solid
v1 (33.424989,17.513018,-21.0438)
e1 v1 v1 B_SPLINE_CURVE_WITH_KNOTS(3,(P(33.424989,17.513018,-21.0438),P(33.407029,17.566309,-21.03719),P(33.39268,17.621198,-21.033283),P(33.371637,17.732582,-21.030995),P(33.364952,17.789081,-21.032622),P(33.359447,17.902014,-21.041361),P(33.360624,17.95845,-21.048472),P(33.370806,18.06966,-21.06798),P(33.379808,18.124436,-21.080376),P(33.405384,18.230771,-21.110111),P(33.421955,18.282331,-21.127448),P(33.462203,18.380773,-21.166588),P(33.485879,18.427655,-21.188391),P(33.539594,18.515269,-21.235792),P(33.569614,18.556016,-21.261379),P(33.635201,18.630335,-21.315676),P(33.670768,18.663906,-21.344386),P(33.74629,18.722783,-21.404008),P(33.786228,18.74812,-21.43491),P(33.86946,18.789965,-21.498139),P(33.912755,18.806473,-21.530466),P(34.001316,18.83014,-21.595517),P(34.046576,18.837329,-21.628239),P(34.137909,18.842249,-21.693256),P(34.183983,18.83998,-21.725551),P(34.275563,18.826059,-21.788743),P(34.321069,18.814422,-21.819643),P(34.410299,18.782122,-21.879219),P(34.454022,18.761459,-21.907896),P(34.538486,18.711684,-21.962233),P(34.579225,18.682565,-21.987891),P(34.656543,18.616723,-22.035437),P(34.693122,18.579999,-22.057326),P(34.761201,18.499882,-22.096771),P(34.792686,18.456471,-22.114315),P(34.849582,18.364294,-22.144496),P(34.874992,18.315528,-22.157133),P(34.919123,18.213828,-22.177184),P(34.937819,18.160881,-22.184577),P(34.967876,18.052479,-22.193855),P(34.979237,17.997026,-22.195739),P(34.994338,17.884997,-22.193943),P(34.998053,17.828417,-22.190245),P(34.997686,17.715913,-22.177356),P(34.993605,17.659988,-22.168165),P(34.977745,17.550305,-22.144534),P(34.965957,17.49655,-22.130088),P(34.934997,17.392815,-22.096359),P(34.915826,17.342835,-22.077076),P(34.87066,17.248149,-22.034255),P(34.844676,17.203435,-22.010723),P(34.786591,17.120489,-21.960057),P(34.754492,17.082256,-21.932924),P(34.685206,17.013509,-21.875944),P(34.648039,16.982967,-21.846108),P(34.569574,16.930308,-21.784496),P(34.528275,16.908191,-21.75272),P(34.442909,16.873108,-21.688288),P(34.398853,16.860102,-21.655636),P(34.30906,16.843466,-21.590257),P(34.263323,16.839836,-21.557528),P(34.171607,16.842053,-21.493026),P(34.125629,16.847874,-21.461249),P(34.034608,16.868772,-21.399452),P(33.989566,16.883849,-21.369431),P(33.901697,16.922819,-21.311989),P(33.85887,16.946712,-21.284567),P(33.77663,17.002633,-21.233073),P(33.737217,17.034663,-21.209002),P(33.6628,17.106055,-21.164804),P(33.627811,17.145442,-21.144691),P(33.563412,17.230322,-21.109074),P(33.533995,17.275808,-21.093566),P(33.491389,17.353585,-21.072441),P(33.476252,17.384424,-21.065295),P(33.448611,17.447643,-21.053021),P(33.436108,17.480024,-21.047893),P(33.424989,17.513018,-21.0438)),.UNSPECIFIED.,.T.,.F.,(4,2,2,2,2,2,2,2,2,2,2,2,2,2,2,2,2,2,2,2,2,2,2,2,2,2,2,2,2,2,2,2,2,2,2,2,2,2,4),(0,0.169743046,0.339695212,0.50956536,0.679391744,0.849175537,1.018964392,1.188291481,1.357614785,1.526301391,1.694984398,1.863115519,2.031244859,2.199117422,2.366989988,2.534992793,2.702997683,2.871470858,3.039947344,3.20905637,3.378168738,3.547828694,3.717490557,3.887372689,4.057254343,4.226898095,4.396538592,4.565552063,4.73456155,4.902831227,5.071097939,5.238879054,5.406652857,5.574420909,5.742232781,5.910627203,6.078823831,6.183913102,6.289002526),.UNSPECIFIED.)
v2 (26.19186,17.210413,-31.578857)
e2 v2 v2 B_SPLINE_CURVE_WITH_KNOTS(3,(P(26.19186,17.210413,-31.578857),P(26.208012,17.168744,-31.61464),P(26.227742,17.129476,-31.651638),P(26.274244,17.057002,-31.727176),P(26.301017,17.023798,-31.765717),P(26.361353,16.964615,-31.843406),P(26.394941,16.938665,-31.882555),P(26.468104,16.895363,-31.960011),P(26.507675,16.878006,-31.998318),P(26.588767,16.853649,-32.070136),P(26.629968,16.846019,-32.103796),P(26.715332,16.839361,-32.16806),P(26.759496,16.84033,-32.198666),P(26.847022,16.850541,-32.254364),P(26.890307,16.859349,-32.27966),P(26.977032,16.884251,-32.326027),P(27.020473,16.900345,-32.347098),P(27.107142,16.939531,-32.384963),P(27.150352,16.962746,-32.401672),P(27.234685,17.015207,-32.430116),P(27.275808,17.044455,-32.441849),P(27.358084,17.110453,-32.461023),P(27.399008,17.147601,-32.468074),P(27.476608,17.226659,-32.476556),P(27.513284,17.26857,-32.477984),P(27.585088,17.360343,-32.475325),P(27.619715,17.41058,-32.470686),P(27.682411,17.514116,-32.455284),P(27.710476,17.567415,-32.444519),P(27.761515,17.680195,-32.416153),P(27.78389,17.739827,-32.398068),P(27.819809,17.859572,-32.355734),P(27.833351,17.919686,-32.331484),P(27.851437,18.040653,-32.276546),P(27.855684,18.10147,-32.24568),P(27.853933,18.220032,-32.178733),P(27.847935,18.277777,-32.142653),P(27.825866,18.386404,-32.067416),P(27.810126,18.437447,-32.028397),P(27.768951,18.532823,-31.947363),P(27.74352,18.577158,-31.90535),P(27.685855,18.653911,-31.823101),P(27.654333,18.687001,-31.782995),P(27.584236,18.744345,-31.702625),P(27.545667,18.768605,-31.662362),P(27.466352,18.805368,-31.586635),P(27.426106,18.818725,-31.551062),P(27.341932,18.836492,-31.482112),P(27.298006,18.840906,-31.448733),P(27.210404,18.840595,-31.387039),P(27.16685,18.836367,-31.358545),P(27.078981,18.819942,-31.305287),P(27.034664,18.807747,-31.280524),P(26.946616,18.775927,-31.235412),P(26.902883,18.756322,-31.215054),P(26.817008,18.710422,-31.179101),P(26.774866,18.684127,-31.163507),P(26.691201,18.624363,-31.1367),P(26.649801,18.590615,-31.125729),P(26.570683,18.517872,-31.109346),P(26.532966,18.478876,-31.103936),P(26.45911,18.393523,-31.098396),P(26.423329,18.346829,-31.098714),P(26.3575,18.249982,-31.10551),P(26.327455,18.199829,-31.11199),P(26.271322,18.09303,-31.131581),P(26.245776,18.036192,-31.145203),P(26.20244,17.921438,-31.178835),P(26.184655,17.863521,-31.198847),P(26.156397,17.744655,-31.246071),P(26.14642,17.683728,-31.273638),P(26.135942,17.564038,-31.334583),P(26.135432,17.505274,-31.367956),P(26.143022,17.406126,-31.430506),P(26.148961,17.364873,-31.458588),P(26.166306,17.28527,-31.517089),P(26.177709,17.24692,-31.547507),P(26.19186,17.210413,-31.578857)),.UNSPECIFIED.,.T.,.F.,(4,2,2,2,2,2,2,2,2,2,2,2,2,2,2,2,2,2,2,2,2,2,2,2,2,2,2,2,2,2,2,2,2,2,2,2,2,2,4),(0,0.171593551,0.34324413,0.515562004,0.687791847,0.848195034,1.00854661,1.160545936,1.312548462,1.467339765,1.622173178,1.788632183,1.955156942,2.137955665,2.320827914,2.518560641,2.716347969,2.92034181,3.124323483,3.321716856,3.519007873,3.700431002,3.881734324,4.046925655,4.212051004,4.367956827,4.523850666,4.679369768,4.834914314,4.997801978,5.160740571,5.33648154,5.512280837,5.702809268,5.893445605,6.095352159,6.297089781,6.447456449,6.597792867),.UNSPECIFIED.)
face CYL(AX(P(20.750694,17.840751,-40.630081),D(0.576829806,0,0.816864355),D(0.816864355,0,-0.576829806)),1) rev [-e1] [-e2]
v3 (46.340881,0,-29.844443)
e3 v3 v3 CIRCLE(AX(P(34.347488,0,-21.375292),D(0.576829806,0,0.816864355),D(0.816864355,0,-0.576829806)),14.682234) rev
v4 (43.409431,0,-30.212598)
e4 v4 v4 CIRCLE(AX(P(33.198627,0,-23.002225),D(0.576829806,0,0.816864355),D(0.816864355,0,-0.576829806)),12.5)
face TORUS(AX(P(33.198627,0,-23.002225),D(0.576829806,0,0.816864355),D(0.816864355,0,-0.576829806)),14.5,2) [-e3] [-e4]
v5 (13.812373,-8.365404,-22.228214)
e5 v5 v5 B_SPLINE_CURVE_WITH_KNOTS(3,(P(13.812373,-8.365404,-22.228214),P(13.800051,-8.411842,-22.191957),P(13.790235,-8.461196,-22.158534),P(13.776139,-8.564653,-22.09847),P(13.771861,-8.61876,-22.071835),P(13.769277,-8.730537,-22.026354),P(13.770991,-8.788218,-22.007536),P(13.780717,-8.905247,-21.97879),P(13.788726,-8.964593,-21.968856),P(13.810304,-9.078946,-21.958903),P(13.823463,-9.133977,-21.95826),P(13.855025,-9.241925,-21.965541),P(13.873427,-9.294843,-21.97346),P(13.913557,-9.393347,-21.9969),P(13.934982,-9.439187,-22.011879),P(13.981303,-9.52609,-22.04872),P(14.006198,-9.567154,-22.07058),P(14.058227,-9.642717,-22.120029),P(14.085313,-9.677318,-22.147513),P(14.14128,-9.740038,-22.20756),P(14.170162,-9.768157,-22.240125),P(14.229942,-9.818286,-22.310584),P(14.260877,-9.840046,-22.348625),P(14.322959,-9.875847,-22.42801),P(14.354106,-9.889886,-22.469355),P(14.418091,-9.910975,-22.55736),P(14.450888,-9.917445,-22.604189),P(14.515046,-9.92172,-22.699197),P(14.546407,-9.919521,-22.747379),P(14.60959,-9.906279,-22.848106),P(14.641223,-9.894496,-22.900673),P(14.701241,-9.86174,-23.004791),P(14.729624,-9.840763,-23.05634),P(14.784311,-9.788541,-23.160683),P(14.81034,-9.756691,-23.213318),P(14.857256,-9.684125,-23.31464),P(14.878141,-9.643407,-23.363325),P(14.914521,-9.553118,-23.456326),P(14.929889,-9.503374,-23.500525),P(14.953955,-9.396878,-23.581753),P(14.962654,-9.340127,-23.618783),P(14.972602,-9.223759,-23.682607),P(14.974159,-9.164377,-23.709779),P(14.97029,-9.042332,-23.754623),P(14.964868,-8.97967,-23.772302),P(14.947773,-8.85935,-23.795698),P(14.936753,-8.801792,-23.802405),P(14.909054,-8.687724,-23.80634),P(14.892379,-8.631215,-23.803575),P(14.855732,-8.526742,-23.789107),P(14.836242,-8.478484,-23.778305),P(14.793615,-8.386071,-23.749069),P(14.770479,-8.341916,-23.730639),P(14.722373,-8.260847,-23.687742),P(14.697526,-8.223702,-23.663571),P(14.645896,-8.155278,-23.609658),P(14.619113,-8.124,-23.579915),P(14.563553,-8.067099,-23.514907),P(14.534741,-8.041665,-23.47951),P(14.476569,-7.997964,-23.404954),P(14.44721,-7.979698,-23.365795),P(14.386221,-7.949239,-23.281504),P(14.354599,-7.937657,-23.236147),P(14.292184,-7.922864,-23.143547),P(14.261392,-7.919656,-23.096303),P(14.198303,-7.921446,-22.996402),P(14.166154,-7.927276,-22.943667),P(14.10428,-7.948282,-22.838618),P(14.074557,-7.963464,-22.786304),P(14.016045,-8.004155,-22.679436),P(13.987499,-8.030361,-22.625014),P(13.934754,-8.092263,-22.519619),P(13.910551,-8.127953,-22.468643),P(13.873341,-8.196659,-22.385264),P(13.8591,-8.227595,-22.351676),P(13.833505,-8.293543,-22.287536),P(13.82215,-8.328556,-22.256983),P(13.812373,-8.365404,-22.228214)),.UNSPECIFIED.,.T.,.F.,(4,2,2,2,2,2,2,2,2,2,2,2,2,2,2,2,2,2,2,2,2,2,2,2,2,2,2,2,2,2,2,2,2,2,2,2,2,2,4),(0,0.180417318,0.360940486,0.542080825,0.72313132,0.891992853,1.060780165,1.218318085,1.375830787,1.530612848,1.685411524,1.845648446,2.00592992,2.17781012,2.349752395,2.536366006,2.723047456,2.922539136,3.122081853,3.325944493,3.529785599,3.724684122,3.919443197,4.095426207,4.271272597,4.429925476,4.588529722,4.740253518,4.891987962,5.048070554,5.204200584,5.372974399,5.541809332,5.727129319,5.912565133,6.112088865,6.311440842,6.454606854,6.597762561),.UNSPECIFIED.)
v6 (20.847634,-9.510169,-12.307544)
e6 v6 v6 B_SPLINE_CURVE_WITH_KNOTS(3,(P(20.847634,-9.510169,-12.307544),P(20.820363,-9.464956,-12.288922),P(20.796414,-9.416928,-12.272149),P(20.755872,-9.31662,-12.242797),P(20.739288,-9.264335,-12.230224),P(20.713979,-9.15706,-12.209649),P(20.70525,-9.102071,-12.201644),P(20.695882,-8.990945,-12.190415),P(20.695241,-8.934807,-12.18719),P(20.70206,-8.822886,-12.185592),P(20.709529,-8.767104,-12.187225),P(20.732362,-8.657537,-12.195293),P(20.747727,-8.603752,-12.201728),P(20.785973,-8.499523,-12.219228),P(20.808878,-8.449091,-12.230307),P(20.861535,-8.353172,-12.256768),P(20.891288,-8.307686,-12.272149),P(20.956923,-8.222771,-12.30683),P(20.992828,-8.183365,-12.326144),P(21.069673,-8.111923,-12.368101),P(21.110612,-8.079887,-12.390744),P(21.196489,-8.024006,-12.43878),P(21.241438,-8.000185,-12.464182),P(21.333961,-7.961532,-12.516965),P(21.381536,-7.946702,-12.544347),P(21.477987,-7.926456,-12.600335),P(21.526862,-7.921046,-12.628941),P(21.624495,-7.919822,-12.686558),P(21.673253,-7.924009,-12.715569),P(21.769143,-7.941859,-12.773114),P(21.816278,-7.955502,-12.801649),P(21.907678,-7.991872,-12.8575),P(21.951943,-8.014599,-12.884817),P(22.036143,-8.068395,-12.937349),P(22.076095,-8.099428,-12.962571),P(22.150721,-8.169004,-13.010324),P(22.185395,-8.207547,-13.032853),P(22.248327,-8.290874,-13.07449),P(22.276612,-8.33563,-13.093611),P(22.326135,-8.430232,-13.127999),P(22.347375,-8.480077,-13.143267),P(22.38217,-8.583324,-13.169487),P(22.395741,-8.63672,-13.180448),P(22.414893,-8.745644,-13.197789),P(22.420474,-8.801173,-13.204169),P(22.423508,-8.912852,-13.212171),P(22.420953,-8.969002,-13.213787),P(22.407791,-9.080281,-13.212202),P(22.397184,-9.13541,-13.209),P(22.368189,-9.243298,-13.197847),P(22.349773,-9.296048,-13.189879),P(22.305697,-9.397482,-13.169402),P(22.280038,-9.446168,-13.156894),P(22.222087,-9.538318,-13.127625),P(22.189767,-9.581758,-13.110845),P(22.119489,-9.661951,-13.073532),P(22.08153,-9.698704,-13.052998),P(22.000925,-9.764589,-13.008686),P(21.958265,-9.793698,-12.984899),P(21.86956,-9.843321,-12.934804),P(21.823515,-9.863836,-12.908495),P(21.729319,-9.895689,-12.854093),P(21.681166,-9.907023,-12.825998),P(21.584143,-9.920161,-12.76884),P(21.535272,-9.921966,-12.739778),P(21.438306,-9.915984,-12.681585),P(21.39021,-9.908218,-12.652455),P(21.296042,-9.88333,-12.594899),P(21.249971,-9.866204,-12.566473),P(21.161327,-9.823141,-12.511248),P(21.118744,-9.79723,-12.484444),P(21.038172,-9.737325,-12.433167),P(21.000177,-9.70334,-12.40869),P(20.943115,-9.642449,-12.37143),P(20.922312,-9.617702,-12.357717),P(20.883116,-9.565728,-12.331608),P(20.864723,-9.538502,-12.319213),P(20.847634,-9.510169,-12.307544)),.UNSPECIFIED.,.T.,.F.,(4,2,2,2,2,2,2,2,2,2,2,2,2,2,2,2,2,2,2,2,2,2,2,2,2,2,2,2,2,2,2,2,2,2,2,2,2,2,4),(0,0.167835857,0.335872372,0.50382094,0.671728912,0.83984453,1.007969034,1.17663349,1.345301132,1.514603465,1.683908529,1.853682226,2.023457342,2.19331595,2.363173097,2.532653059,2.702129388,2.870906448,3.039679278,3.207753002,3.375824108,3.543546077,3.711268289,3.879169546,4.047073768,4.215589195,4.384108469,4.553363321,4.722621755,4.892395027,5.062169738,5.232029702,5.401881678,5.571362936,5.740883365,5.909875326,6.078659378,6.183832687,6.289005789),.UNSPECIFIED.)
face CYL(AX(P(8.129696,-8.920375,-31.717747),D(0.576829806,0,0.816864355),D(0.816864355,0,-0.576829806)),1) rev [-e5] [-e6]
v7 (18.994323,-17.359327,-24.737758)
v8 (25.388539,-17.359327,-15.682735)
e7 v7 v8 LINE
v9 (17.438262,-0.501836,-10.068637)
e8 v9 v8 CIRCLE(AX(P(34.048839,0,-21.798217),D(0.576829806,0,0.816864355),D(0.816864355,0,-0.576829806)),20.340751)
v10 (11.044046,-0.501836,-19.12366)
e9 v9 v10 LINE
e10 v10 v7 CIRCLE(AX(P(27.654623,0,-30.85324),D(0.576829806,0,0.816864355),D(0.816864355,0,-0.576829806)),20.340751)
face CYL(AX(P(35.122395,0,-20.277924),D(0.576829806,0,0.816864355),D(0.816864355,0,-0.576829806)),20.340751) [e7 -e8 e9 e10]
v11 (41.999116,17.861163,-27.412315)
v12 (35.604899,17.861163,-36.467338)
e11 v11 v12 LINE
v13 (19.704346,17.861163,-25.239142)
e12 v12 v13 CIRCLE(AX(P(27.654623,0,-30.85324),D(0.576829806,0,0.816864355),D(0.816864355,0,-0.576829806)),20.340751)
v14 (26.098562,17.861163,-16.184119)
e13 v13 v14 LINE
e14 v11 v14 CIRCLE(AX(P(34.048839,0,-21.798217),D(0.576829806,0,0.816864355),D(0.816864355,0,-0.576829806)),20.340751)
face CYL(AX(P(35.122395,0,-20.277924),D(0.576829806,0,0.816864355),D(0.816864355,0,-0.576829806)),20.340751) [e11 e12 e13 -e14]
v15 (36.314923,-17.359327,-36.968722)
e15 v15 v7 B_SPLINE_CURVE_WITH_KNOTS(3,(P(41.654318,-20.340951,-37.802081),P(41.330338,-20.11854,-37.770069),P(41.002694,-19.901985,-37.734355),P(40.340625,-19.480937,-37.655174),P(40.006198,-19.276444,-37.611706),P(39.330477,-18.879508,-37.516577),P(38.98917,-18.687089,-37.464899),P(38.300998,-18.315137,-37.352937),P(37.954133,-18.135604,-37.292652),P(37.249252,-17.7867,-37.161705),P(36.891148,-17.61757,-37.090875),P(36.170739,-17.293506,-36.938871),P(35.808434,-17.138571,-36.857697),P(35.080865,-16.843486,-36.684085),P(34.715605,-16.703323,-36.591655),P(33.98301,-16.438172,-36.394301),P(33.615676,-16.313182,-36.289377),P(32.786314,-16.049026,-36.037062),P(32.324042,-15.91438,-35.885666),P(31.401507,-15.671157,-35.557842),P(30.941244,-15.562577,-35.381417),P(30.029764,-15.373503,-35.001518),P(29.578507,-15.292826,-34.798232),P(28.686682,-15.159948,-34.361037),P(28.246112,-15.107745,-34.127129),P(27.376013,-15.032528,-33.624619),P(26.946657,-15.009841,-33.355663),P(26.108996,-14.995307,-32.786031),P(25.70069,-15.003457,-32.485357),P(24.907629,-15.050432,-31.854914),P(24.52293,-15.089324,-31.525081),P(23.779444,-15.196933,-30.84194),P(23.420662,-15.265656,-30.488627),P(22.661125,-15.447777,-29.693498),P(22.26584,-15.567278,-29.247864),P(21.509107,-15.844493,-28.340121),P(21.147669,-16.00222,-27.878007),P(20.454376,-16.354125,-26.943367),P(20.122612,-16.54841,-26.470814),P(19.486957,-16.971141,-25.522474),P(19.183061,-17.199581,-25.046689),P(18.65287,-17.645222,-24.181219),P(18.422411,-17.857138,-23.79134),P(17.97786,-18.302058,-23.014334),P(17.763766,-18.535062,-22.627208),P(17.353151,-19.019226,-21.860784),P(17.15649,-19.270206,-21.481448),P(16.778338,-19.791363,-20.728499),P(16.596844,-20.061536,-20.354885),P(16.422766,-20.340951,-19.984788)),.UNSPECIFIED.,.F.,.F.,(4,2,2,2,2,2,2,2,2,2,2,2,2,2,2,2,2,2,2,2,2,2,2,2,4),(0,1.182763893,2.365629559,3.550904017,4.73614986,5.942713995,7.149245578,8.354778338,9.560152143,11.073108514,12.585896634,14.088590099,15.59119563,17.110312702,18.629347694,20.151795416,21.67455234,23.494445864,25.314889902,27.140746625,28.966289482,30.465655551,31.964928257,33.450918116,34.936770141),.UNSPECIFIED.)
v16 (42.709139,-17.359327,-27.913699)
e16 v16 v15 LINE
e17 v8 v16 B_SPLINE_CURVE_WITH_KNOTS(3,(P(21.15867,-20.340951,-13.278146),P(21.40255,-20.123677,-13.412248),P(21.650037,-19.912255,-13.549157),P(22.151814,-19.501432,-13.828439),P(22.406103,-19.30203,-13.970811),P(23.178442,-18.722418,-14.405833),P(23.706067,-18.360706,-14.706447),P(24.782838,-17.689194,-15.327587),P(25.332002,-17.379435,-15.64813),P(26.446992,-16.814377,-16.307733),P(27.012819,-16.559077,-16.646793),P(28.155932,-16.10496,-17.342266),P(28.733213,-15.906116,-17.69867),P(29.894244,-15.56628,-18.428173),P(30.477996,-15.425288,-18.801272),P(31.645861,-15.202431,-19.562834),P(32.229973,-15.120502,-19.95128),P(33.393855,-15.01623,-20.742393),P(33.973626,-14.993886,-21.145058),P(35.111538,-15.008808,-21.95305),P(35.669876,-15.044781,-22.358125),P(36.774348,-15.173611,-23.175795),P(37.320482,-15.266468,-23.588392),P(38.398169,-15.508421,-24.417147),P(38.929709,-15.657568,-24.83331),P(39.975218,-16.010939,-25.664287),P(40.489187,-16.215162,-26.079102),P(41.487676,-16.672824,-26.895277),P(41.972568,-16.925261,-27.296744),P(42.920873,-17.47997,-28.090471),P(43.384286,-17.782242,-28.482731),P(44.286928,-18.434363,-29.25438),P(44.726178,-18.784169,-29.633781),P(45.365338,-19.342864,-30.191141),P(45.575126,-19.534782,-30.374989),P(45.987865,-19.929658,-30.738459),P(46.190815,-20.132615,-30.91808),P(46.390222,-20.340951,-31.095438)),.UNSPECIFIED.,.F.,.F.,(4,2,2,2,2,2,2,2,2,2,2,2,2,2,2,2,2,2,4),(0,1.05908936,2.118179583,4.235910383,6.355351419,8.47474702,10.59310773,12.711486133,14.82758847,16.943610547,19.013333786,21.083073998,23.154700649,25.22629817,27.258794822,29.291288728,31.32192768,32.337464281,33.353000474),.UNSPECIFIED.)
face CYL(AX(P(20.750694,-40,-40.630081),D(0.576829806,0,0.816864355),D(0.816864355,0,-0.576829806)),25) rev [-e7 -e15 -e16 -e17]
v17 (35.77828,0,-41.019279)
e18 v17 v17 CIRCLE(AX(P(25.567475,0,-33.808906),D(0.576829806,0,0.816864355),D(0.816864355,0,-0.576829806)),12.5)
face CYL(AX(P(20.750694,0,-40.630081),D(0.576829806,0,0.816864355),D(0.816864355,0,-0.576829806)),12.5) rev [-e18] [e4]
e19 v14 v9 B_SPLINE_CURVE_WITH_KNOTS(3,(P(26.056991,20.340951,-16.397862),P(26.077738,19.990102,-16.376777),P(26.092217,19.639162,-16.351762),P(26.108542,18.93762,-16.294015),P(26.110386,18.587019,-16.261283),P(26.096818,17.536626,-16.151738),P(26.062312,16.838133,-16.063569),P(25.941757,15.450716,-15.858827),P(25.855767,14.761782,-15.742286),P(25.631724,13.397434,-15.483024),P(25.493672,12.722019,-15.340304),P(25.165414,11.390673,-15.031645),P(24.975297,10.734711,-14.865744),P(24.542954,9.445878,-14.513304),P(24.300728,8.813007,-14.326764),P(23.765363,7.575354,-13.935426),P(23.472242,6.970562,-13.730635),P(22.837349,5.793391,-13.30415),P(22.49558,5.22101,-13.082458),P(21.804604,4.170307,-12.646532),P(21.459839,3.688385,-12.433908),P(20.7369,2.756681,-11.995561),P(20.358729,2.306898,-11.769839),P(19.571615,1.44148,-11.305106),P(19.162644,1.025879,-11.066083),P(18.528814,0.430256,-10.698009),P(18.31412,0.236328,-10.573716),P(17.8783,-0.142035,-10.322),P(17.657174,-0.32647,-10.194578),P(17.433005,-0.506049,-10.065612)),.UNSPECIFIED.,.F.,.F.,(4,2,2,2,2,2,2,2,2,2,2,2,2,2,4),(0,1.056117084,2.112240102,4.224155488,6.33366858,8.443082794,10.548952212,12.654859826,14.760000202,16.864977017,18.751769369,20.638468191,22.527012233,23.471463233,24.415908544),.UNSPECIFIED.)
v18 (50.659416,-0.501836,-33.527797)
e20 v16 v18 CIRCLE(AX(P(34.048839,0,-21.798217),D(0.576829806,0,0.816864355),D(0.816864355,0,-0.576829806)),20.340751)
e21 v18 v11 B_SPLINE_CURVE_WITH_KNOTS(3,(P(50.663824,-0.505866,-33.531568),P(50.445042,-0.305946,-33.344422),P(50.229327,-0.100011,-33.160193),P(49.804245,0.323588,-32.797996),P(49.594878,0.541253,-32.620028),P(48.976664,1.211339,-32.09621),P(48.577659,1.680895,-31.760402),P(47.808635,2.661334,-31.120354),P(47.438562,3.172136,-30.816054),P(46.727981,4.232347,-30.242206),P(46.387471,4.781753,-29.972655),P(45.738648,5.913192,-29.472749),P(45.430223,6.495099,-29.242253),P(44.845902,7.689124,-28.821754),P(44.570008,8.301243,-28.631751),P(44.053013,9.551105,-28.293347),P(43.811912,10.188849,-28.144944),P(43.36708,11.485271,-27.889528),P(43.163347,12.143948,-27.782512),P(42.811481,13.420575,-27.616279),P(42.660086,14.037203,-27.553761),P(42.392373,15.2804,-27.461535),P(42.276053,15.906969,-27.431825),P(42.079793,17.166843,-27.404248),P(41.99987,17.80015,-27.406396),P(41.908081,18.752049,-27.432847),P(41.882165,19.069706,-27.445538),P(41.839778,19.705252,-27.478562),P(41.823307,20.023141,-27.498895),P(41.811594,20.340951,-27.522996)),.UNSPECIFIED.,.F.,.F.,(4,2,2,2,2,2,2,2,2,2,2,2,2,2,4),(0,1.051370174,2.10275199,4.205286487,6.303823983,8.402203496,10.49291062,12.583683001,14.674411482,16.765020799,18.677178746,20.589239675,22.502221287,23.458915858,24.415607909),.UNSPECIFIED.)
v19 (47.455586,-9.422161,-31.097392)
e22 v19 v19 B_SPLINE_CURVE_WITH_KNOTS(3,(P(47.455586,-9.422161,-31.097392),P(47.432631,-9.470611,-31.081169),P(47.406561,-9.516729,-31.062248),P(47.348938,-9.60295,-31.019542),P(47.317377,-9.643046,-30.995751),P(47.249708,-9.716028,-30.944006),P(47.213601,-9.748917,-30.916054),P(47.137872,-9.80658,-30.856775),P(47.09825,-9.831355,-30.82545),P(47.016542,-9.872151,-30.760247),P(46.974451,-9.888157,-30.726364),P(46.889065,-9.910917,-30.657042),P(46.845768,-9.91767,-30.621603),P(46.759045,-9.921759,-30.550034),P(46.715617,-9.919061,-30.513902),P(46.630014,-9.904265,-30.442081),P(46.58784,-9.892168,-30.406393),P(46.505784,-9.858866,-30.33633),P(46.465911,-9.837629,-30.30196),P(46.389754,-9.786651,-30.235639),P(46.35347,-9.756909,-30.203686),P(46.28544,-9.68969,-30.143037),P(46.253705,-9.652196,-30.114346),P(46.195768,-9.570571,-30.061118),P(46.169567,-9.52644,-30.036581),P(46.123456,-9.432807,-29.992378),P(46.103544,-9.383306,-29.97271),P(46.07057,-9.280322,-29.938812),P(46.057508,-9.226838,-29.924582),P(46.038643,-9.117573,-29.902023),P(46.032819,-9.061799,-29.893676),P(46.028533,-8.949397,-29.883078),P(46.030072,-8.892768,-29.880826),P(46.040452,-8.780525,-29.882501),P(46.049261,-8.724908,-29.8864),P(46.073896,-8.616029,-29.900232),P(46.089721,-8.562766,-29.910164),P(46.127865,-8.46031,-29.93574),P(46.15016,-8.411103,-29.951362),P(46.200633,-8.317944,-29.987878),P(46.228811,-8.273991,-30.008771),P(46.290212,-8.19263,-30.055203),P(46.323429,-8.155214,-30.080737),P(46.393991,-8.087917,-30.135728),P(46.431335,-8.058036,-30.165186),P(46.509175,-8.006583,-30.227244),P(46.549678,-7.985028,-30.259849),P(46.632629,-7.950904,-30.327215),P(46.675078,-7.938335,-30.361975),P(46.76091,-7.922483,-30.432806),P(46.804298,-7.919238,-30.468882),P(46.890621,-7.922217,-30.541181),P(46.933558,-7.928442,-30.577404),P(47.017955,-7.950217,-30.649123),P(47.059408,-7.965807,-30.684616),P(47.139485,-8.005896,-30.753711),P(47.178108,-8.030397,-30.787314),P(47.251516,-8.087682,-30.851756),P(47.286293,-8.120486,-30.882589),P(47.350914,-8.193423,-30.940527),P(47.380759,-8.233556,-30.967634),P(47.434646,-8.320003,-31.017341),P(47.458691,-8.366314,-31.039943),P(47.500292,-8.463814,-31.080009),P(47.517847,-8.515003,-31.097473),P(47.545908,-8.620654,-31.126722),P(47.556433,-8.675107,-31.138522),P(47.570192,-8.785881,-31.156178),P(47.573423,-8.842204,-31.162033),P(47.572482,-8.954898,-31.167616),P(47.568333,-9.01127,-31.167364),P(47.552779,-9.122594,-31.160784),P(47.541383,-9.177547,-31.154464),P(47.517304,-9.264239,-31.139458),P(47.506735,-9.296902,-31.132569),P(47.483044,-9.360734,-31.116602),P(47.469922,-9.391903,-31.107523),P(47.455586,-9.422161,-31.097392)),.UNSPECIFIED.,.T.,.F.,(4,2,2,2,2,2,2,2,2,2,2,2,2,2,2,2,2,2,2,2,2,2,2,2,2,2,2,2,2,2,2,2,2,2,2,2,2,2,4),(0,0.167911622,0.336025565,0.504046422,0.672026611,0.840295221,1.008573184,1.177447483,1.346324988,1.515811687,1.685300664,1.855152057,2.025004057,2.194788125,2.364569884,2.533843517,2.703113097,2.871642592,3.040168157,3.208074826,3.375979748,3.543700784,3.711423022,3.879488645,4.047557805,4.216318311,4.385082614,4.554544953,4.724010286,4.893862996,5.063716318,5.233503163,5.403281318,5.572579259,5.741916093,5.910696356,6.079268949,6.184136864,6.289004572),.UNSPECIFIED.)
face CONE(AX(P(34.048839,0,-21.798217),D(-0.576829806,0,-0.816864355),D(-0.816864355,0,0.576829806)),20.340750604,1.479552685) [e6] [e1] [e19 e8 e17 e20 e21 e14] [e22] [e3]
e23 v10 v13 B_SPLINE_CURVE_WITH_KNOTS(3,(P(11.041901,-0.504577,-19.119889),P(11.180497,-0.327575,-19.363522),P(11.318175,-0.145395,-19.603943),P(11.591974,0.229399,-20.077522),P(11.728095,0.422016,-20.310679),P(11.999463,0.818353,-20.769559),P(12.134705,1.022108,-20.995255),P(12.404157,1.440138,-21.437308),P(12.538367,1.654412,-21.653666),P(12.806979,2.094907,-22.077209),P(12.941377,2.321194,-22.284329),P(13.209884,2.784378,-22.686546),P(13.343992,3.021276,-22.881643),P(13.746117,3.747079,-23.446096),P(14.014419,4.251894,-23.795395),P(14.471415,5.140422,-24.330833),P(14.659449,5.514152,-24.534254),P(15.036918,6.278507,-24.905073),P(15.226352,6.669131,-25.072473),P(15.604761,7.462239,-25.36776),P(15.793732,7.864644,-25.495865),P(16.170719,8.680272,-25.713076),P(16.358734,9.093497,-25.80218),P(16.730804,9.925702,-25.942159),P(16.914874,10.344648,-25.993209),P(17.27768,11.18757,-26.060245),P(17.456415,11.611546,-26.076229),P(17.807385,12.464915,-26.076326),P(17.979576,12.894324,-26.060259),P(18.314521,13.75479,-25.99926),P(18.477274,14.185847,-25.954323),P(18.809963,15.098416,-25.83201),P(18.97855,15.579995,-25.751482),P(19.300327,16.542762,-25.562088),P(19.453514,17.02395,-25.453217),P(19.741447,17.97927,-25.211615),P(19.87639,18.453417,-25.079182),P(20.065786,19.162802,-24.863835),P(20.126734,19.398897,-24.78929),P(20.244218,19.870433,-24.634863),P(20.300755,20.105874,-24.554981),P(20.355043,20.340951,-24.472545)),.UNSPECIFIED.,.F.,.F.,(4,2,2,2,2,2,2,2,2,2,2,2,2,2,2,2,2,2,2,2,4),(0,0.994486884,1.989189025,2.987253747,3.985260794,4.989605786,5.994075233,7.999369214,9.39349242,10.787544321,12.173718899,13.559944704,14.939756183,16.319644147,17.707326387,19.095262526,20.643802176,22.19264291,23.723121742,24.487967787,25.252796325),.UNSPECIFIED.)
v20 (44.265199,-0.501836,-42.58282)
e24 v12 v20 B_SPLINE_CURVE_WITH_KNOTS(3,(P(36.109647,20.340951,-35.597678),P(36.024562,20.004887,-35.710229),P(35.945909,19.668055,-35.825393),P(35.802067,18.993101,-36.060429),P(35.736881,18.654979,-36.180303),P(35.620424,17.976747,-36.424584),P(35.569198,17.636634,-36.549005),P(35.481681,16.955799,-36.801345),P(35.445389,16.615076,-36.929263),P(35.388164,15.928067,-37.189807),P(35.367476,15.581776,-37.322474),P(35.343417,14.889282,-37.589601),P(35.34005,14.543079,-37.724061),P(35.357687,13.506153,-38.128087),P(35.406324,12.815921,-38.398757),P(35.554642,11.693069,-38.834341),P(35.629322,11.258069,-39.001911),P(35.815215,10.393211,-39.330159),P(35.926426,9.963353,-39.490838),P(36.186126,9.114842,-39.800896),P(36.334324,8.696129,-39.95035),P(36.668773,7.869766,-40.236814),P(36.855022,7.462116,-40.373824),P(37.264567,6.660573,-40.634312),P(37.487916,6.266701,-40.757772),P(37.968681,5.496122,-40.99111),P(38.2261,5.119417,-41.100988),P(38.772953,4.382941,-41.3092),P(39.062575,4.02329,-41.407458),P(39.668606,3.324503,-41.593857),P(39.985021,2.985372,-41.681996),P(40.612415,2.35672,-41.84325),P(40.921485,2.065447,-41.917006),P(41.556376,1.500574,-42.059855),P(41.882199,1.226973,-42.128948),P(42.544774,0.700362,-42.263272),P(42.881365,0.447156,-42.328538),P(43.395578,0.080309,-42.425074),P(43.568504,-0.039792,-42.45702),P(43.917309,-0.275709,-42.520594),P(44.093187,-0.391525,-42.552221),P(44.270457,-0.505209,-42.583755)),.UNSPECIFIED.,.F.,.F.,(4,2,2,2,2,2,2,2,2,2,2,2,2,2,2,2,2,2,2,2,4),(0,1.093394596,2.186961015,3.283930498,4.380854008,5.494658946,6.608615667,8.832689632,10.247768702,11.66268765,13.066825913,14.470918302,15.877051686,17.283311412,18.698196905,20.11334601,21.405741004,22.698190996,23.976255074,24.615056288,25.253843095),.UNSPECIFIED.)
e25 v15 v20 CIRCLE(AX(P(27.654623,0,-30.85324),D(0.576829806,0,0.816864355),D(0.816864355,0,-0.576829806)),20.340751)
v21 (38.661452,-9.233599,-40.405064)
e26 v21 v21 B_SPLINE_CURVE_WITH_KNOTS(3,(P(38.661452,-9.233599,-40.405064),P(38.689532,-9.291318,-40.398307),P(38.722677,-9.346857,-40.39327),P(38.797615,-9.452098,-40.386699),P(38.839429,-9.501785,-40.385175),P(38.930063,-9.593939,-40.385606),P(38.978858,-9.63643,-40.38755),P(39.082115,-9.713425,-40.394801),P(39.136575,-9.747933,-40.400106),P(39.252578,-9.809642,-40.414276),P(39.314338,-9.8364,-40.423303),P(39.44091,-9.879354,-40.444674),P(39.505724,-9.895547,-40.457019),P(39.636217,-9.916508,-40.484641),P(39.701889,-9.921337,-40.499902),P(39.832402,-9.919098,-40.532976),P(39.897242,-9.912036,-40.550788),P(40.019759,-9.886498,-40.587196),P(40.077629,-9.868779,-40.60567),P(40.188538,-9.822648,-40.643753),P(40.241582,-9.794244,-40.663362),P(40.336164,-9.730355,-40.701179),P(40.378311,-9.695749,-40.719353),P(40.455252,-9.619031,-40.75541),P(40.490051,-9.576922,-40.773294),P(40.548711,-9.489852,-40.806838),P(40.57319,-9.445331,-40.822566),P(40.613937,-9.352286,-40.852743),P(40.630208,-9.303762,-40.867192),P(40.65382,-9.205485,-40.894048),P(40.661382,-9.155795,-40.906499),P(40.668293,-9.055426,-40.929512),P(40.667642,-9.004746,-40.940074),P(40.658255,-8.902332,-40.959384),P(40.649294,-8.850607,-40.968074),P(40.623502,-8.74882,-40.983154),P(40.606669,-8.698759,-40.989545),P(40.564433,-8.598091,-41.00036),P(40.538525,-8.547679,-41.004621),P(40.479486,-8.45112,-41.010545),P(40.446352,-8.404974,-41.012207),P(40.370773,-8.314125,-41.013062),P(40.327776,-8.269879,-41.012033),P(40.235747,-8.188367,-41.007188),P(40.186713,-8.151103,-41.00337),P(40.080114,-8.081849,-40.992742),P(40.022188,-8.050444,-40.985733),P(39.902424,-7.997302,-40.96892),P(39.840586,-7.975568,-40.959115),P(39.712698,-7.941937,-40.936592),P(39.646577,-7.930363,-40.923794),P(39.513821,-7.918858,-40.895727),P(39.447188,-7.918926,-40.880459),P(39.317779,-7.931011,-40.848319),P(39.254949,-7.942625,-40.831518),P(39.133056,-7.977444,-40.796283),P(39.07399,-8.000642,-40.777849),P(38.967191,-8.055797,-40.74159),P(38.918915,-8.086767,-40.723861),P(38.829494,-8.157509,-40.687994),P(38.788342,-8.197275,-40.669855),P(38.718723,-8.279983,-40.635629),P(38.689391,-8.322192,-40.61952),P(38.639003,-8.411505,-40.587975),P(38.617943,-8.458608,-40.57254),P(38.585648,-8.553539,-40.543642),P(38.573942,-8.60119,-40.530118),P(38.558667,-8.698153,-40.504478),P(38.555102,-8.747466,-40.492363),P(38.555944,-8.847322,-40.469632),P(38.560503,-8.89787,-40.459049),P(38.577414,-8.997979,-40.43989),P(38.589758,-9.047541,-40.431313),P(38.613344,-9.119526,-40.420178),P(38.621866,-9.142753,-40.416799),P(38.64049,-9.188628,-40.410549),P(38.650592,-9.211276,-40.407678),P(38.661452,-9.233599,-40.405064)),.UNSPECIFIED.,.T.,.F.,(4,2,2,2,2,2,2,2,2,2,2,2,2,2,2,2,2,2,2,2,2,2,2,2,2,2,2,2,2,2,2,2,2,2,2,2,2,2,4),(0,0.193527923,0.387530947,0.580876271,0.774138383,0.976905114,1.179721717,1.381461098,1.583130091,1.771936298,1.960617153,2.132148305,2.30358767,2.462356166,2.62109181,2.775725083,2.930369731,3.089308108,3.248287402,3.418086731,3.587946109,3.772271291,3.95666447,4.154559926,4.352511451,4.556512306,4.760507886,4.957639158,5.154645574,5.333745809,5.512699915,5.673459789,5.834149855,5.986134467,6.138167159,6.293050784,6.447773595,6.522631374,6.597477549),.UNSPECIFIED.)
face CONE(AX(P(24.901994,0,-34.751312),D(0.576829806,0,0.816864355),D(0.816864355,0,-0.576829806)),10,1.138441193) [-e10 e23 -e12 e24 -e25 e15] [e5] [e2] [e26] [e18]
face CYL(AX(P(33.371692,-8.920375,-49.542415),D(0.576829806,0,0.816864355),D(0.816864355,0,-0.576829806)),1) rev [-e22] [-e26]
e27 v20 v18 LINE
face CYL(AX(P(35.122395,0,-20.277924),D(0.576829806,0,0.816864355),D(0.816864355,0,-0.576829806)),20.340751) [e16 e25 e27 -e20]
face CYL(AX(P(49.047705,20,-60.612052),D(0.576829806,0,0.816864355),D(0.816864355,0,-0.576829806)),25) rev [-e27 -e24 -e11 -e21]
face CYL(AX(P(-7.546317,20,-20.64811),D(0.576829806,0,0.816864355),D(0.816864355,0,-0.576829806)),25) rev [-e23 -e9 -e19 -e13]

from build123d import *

# Parameters (mm, degrees)
SKETCH_2_R          = 1
SKETCH_2_R_2        = 25
SKETCH_2_R_3        = 12.5
CUT_EXTRUDE_1_DEPTH = 24
FILLET_1_R          = 2


with BuildPart() as part:
    # 草图1 → 旋转1 (revolve)
    with BuildSketch(Plane(origin=(0, 0, 0), x_dir=(1, 0, 0), z_dir=(0, 1, 0))):
        Polygon((16.733350813, 28.983013789), (11.038988511, 19.120088966), (17.433204862, 10.06506552), (26.42596579, 15.257038463), align=None)
    revolve(axis=Axis((35.122395357, 0, -20.277924414), (-0.576829805989874, 0, -0.8168643552767402)))

    # 草图2 → 切除-拉伸1 (cut)
    with BuildSketch(Plane(origin=(1.603790962, 0, 2.271171941), x_dir=(0.8168643552767402, 0, -0.576829805989874), z_dir=(0.576829805989874, 0, 0.8168643552767403))):
        with Locations((40.387144045, 17.840750604)):
            Circle(SKETCH_2_R)
        with Locations((5.746127894, 20)):
            Circle(SKETCH_2_R_2)
        with Locations((75.028160197, 20)):
            Circle(SKETCH_2_R_2)
        with Locations((55.837687291, -8.920375302)):
            Circle(SKETCH_2_R)
        with Locations((40.387144045, -40)):
            Circle(SKETCH_2_R_2)
        with Locations((24.9366008, -8.920375302)):
            Circle(SKETCH_2_R)
        with Locations((40.387144045, 0)):
            Circle(SKETCH_2_R_3)
    extrude(amount=-CUT_EXTRUDE_1_DEPTH, mode=Mode.SUBTRACT)

    # 圆角1
    fillet_1_edges = [part.edges().sort_by_distance(p)[0] for p in [
        (34.46266284, 12.5, -21.21218955),
    ]]
    fillet(fillet_1_edges, radius=FILLET_1_R)


solid = part.part
